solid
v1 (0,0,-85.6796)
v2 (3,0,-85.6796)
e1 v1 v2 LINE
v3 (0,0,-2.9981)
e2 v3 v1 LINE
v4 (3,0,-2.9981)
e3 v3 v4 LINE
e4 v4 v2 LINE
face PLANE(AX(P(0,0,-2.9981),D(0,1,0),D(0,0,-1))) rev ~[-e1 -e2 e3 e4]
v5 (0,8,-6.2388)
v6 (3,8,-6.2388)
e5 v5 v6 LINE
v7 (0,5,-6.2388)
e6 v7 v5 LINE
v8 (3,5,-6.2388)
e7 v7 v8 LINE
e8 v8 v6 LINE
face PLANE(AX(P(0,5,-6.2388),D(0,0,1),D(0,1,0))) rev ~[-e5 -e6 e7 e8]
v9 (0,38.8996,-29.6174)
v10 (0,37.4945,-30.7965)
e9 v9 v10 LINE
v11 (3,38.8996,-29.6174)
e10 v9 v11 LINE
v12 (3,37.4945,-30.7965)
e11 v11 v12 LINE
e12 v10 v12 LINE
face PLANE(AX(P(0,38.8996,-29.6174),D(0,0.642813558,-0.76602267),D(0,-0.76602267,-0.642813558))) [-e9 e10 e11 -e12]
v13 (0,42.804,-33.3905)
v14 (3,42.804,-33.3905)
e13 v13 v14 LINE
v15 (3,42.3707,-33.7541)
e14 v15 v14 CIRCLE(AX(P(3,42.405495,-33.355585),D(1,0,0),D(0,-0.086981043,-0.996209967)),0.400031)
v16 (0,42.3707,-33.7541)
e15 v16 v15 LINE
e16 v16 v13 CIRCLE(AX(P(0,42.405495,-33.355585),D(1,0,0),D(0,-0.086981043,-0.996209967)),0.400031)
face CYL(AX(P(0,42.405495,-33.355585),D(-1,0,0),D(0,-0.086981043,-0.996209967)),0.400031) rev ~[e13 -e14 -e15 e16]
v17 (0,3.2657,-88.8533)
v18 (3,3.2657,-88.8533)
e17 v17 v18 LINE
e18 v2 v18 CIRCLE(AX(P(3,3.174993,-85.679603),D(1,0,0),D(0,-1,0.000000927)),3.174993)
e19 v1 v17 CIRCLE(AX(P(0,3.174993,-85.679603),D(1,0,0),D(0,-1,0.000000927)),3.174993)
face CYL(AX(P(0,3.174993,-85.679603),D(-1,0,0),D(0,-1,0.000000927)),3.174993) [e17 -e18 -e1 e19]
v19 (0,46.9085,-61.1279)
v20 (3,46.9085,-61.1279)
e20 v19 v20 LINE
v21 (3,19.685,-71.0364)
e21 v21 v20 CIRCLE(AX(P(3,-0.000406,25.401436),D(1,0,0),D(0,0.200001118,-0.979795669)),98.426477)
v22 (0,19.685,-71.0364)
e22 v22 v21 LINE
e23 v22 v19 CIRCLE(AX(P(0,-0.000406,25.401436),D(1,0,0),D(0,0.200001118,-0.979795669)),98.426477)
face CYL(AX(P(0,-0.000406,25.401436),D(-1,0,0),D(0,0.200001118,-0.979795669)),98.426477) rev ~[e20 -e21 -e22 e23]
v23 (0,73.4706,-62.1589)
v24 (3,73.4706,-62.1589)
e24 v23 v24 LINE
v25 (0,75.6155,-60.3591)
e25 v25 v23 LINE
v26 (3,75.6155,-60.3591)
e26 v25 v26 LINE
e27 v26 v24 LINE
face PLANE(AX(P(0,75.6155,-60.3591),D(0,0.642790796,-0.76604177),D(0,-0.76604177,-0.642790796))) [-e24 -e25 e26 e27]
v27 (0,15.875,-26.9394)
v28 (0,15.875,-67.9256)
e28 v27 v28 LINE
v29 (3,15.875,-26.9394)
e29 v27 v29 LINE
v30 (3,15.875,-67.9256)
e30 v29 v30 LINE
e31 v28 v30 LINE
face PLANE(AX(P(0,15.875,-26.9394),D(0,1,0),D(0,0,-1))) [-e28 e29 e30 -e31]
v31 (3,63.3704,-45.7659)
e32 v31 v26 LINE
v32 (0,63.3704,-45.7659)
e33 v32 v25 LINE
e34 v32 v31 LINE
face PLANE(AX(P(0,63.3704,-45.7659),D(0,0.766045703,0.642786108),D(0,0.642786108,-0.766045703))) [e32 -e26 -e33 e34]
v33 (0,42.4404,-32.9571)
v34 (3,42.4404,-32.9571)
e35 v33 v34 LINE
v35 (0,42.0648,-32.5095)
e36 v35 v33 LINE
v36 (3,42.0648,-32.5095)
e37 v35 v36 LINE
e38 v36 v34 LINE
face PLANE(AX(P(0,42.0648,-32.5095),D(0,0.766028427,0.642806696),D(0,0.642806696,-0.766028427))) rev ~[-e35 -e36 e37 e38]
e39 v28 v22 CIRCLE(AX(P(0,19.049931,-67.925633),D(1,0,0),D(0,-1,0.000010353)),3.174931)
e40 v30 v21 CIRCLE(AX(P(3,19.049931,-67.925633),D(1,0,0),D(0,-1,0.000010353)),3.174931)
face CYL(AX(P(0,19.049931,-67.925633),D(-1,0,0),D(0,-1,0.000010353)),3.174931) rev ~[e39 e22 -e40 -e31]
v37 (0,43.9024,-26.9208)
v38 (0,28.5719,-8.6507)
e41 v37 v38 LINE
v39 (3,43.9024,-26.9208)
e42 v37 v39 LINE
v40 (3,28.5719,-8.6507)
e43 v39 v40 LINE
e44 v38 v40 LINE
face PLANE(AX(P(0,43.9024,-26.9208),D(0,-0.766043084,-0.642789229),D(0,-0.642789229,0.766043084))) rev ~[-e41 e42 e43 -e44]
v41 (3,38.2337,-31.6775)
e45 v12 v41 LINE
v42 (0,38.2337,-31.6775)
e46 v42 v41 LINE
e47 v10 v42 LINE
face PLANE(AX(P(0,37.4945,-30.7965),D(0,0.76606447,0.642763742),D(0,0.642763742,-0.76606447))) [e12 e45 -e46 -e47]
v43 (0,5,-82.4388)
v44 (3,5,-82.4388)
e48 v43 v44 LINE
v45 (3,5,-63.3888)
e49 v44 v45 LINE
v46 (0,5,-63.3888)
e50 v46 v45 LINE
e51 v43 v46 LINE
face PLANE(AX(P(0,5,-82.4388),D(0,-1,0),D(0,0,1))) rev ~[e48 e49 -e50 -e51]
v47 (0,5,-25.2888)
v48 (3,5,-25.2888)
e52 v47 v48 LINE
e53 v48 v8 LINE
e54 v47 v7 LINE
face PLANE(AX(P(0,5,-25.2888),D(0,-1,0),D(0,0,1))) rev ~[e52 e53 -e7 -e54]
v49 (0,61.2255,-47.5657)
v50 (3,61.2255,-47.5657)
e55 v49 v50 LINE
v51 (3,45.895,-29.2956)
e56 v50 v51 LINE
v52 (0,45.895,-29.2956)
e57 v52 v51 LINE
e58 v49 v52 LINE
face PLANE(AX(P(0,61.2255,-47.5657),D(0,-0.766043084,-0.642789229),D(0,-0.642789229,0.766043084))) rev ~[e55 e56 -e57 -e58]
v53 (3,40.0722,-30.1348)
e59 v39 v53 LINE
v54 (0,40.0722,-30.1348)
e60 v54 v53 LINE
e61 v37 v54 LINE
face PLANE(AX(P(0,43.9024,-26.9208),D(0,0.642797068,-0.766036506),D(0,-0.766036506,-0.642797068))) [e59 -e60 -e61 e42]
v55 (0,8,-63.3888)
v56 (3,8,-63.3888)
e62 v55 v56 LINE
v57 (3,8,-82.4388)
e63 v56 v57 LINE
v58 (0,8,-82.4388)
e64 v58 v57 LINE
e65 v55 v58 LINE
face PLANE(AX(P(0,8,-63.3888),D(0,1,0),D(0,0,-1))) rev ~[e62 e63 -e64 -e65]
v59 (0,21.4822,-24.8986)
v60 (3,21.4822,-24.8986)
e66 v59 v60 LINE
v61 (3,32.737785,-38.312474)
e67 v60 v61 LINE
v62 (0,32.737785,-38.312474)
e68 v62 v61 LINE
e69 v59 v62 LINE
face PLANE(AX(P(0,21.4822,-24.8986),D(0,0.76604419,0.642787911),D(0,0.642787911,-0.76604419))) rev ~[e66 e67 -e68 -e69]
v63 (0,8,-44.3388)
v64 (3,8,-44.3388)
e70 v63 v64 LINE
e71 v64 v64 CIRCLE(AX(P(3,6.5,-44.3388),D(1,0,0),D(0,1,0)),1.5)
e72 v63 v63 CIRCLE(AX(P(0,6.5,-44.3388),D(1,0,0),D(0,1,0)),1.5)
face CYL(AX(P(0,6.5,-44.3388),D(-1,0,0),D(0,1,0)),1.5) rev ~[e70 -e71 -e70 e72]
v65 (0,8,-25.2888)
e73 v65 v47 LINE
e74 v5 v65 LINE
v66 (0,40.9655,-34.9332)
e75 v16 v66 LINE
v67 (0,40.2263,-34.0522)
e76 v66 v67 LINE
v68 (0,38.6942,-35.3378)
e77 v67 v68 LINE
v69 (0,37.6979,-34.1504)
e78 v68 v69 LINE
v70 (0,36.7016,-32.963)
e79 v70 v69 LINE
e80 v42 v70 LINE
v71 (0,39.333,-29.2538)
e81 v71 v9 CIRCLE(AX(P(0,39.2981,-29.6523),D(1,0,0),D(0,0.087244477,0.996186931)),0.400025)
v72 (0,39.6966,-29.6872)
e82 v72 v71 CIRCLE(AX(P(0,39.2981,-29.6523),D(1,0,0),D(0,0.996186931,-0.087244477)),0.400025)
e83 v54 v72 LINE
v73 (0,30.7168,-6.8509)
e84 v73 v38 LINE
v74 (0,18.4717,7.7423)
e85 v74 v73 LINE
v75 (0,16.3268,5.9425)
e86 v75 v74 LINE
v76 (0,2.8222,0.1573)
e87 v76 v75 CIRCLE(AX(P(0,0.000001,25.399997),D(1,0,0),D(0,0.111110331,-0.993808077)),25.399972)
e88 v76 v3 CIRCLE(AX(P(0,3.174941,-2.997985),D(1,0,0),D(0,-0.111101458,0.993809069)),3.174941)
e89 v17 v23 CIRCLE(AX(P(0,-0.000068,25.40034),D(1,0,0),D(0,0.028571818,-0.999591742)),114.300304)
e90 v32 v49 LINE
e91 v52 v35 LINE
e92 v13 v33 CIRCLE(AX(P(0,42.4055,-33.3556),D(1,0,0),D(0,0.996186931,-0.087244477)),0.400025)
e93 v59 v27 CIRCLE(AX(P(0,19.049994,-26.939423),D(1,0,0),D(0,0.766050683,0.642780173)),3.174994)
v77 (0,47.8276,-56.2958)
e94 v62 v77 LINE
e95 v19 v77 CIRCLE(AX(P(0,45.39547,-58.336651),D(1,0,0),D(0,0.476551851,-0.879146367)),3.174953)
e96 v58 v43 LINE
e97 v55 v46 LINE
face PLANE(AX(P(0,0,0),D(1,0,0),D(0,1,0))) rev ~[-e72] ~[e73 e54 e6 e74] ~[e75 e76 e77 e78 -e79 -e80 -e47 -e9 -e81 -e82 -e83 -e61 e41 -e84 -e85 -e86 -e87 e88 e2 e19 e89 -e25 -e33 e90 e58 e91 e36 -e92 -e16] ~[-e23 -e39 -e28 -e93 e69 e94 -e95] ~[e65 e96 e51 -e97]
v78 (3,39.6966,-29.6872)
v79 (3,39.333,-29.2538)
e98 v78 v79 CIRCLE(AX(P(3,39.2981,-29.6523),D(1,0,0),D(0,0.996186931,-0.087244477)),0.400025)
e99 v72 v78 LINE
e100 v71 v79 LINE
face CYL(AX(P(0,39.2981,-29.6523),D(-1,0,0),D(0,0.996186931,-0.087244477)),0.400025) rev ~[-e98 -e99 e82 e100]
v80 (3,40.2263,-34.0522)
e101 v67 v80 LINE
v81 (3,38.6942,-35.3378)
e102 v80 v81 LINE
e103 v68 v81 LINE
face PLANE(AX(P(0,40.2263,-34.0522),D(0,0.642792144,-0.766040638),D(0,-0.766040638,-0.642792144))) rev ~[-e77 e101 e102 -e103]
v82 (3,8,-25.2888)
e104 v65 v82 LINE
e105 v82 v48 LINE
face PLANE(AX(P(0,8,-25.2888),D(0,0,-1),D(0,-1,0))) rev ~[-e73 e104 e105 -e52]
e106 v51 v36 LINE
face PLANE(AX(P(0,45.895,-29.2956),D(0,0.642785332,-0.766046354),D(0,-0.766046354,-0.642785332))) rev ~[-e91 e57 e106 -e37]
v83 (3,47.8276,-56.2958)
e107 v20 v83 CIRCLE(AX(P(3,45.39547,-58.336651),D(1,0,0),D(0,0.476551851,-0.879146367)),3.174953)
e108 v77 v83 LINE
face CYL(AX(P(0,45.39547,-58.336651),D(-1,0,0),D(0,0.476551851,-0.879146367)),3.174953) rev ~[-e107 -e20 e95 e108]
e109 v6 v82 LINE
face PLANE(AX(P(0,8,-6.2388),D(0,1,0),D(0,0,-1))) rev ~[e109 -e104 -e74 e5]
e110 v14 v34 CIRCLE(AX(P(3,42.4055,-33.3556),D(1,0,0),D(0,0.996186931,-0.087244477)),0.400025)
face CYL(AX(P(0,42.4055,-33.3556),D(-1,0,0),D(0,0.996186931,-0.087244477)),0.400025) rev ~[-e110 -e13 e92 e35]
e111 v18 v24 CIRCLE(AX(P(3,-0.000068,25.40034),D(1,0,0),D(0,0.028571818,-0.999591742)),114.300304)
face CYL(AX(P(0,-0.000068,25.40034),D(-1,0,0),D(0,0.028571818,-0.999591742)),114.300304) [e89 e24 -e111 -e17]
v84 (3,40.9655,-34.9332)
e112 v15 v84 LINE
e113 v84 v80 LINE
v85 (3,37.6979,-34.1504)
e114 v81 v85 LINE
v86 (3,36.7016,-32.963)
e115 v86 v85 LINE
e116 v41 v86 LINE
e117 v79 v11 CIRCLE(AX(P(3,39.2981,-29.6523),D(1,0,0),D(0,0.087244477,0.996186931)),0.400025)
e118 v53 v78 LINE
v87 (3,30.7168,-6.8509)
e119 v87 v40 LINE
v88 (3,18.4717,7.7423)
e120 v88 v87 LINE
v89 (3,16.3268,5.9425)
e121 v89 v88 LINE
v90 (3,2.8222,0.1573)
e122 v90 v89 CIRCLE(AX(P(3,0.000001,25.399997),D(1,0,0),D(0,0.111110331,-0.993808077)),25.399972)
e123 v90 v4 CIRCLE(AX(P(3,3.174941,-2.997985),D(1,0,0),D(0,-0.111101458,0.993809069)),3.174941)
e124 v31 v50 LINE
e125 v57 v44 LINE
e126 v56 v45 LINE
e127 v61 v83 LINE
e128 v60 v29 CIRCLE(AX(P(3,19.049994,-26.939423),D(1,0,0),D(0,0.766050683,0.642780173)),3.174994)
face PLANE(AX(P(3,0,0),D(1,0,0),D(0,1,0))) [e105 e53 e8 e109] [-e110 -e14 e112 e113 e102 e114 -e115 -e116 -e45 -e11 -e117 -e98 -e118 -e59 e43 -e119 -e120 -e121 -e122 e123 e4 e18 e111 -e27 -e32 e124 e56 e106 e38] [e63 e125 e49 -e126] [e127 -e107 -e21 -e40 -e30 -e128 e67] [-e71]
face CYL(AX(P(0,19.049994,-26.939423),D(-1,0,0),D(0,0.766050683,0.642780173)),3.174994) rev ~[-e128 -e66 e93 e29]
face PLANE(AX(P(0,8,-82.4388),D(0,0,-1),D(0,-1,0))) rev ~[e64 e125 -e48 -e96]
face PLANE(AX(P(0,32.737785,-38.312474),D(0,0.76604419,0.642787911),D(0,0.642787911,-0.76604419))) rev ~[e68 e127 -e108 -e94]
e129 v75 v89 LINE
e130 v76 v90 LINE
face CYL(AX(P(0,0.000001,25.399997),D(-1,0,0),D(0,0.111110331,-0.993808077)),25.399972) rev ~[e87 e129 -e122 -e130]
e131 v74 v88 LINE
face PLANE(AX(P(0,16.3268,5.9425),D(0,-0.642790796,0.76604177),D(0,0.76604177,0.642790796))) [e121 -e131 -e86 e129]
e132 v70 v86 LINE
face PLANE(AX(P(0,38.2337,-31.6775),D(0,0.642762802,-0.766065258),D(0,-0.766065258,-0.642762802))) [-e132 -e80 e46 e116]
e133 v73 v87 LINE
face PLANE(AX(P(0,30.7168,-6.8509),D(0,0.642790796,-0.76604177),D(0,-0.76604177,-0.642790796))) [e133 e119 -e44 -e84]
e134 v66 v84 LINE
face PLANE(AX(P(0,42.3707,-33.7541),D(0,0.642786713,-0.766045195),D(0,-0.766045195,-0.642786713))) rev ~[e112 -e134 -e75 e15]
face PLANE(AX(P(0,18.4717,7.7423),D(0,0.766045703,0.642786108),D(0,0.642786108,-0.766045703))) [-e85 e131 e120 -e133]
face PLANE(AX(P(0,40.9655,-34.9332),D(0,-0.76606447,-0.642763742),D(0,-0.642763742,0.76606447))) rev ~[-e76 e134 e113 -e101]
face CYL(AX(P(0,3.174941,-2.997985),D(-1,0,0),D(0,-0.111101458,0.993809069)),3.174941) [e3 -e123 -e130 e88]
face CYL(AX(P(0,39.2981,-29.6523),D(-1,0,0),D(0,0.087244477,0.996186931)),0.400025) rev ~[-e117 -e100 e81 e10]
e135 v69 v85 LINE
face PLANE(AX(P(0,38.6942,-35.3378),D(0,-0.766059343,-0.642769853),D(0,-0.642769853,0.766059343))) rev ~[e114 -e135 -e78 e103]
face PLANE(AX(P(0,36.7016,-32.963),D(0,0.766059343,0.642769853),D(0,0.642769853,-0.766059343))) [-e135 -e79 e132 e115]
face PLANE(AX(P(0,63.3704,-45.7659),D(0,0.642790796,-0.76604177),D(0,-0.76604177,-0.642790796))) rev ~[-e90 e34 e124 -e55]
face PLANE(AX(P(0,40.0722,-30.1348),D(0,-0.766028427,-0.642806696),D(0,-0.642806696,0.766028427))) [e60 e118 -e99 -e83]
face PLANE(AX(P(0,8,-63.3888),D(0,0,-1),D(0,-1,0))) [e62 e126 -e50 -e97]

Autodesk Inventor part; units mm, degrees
ref_plane "YZ Plane" through (0, 0, 0) normal (1, 0, 0) x (0, 1, 0)
ref_plane "XZ Plane" through (0, 0, 0) normal (0, 1, 0) x (-1, 0, 0)
ref_plane "XY Plane" through (0, 0, 0) normal (0, 0, 1) x (1, 0, 0)
sketch "Sketch1" plane through (0, 0, 0) normal (1, 0, 0) x (0, 1, 0)
  line L0 (18.4717, 7.7423) -> (30.7168, -6.8509)
  line L1 (75.6155, -60.3591) -> (73.4706, -62.1589)
  line L2 (73.4706, -62.1589) -> (61.2255, -47.5657) construction
  line L3 (16.3268, 5.9425) -> (18.4717, 7.7423)
  line L4 (30.7168, -6.8509) -> (28.5719, -8.6507)
  line L5 (63.3704, -45.7659) -> (61.2255, -47.5657)
  line L6 (30.7168, -6.8509) -> (63.3704, -45.7659) construction
  line L7 (63.3704, -45.7659) -> (75.6155, -60.3591)
  line L8 (61.2255, -47.5657) -> (45.895, -29.2956)
  line L9 (28.5719, -8.6507) -> (16.3268, 5.9425) construction
  arc A0 (2.8222, 0.1573) -> (16.3268, 5.9425) centre (0, 25.4) ccw
  line L10 (0, -2.9981) -> (0, -85.6796)
  arc A1 (3.2657, -88.8533) -> (73.4706, -62.1589) centre (0, 25.4) ccw
  arc A2 (2.8222, 0.1573) -> (0, -2.9981) centre (3.175, -2.9981) ccw
  arc A3 (0, -85.6796) -> (3.2657, -88.8533) centre (3.175, -85.6796) ccw
  line L11 (5, -6.2388) -> (8, -6.2388)
  line L12 (8, -6.2388) -> (8, -25.2888)
  line L13 (8, -82.4388) -> (5, -82.4388)
  line L14 (5, -82.4388) -> (5, -63.3888)
  line L15 (8, -25.2888) -> (5, -25.2888)
  line L16 (8, -63.3888) -> (5, -63.3888)
  line L17 (8, -25.2888) -> (8, -63.3888) construction
  line L18 (5, -25.2888) -> (5, -6.2388)
  line L19 (5, -63.3888) -> (5, -25.2888) construction
  line L20 (8, -63.3888) -> (8, -82.4388)
  circle A4 centre (6.5, -44.3388) radius 1.5
  line L21 (51.7389, -22.3686) -> (29.8853, -40.706)
  line L22 (43.9024, -26.9208) -> (40.0722, -30.1348)
  line L23 (40.0722, -30.1348) -> (39.6966, -29.6872)
  line L24 (39.333, -29.2538) -> (38.8996, -29.6174) construction
  line L25 (37.4945, -30.7965) -> (38.2337, -31.6775)
  line L26 (38.2337, -31.6775) -> (36.7016, -32.963)
  line L27 (36.7016, -32.963) -> (37.6979, -34.1504)
  arc A5 (39.6966, -29.6872) -> (39.333, -29.2538) centre (39.2981, -29.6523) ccw
  line L28 (39.6966, -29.6872) -> (39.333, -29.2538) construction
  line L29 (38.8996, -29.6174) -> (37.4945, -30.7965)
  arc A6 (39.333, -29.2538) -> (38.8996, -29.6174) centre (39.2981, -29.6523) ccw
  line L30 (45.895, -29.2956) -> (42.0648, -32.5095)
  line L31 (42.0648, -32.5095) -> (42.4404, -32.9571)
  line L32 (40.9655, -34.9332) -> (40.2263, -34.0522)
  line L33 (40.2263, -34.0522) -> (38.6942, -35.3378)
  line L34 (38.6942, -35.3378) -> (37.6979, -34.1504)
  arc A7 (42.804, -33.3905) -> (42.4404, -32.9571) centre (42.4055, -33.3556) ccw
  line L35 (42.3707, -33.7541) -> (40.9655, -34.9332)
  arc A8 (42.3707, -33.7541) -> (42.804, -33.3905) centre (42.4055, -33.3556) ccw
  line L36 (43.9024, -26.9208) -> (28.5719, -8.6507)
  line L37 (45.895, -29.2956) -> (43.9024, -26.9208)
  line L38 (15.875, -26.9394) -> (15.875, -67.9256)
  line L39 (21.4822, -24.8986) -> (47.8276, -56.2958)
  arc A9 (19.685, -71.0364) -> (46.9085, -61.1279) centre (0, 25.4) ccw
  arc A10 (21.4822, -24.8986) -> (15.875, -26.9394) centre (19.05, -26.9394) ccw
  arc A11 (15.875, -67.9256) -> (19.685, -71.0364) centre (19.05, -67.9256) ccw
  arc A12 (46.9085, -61.1279) -> (47.8276, -56.2958) centre (45.3954, -58.3366) ccw
  point P0 (0, 0)
  point P1 (0, 0)
  point P2 (0, -88.9)
  point P3 (75.5935, -60.3328)
  point P4 (0, -44.3388)
  point P5 (5, -44.3388)
  point P6 (6.5, -25.2888)
  point P7 (44.8987, -28.1082)
  point P8 (15.875, -71.7363)
  point P9 (50.2771, -59.215)
  point P10 (15.875, -71.7363)
  dimension "d0" = 2.8
  dimension "d1" = 88.9
  dimension "d2" = 19.05
  dimension "d3" = 19.05
  dimension "d4" = 40
  dimension "d5" = 25.4
  dimension "d6" = 3.175
  dimension "d7" = 3
  dimension "d8" = 76.2
  dimension "d9" = 5
  dimension "d10" = 19.05
  dimension "d11" = 3
  dimension "d12" = 3.1
  dimension "d13" = 5.4
  dimension "d14" = 5
  dimension "d15" = 0.4
  dimension "d16" = 2.4
  dimension "d17" = 2
  dimension "d22" = 15.875
  dimension "d23" = 15.875
  dimension "d24" = 15.875
  dimension "d25" = 3.175
extrude "Extrusion1" add sketch "Sketch1" along normal blind 3 contours L0 L4 L36 L22 L23 A5 A6 L29 L25 L26 L27 L34 L33 L32 L35 A8 A7 L31 L30 L8 L5 L7 L1 A1 A3 L10 A2 A0 L3
equation "\"d3\" = d2"
equation "\"d23\" = d22"
equation "\"d24\" = d22"
properties part number "SideMount"
